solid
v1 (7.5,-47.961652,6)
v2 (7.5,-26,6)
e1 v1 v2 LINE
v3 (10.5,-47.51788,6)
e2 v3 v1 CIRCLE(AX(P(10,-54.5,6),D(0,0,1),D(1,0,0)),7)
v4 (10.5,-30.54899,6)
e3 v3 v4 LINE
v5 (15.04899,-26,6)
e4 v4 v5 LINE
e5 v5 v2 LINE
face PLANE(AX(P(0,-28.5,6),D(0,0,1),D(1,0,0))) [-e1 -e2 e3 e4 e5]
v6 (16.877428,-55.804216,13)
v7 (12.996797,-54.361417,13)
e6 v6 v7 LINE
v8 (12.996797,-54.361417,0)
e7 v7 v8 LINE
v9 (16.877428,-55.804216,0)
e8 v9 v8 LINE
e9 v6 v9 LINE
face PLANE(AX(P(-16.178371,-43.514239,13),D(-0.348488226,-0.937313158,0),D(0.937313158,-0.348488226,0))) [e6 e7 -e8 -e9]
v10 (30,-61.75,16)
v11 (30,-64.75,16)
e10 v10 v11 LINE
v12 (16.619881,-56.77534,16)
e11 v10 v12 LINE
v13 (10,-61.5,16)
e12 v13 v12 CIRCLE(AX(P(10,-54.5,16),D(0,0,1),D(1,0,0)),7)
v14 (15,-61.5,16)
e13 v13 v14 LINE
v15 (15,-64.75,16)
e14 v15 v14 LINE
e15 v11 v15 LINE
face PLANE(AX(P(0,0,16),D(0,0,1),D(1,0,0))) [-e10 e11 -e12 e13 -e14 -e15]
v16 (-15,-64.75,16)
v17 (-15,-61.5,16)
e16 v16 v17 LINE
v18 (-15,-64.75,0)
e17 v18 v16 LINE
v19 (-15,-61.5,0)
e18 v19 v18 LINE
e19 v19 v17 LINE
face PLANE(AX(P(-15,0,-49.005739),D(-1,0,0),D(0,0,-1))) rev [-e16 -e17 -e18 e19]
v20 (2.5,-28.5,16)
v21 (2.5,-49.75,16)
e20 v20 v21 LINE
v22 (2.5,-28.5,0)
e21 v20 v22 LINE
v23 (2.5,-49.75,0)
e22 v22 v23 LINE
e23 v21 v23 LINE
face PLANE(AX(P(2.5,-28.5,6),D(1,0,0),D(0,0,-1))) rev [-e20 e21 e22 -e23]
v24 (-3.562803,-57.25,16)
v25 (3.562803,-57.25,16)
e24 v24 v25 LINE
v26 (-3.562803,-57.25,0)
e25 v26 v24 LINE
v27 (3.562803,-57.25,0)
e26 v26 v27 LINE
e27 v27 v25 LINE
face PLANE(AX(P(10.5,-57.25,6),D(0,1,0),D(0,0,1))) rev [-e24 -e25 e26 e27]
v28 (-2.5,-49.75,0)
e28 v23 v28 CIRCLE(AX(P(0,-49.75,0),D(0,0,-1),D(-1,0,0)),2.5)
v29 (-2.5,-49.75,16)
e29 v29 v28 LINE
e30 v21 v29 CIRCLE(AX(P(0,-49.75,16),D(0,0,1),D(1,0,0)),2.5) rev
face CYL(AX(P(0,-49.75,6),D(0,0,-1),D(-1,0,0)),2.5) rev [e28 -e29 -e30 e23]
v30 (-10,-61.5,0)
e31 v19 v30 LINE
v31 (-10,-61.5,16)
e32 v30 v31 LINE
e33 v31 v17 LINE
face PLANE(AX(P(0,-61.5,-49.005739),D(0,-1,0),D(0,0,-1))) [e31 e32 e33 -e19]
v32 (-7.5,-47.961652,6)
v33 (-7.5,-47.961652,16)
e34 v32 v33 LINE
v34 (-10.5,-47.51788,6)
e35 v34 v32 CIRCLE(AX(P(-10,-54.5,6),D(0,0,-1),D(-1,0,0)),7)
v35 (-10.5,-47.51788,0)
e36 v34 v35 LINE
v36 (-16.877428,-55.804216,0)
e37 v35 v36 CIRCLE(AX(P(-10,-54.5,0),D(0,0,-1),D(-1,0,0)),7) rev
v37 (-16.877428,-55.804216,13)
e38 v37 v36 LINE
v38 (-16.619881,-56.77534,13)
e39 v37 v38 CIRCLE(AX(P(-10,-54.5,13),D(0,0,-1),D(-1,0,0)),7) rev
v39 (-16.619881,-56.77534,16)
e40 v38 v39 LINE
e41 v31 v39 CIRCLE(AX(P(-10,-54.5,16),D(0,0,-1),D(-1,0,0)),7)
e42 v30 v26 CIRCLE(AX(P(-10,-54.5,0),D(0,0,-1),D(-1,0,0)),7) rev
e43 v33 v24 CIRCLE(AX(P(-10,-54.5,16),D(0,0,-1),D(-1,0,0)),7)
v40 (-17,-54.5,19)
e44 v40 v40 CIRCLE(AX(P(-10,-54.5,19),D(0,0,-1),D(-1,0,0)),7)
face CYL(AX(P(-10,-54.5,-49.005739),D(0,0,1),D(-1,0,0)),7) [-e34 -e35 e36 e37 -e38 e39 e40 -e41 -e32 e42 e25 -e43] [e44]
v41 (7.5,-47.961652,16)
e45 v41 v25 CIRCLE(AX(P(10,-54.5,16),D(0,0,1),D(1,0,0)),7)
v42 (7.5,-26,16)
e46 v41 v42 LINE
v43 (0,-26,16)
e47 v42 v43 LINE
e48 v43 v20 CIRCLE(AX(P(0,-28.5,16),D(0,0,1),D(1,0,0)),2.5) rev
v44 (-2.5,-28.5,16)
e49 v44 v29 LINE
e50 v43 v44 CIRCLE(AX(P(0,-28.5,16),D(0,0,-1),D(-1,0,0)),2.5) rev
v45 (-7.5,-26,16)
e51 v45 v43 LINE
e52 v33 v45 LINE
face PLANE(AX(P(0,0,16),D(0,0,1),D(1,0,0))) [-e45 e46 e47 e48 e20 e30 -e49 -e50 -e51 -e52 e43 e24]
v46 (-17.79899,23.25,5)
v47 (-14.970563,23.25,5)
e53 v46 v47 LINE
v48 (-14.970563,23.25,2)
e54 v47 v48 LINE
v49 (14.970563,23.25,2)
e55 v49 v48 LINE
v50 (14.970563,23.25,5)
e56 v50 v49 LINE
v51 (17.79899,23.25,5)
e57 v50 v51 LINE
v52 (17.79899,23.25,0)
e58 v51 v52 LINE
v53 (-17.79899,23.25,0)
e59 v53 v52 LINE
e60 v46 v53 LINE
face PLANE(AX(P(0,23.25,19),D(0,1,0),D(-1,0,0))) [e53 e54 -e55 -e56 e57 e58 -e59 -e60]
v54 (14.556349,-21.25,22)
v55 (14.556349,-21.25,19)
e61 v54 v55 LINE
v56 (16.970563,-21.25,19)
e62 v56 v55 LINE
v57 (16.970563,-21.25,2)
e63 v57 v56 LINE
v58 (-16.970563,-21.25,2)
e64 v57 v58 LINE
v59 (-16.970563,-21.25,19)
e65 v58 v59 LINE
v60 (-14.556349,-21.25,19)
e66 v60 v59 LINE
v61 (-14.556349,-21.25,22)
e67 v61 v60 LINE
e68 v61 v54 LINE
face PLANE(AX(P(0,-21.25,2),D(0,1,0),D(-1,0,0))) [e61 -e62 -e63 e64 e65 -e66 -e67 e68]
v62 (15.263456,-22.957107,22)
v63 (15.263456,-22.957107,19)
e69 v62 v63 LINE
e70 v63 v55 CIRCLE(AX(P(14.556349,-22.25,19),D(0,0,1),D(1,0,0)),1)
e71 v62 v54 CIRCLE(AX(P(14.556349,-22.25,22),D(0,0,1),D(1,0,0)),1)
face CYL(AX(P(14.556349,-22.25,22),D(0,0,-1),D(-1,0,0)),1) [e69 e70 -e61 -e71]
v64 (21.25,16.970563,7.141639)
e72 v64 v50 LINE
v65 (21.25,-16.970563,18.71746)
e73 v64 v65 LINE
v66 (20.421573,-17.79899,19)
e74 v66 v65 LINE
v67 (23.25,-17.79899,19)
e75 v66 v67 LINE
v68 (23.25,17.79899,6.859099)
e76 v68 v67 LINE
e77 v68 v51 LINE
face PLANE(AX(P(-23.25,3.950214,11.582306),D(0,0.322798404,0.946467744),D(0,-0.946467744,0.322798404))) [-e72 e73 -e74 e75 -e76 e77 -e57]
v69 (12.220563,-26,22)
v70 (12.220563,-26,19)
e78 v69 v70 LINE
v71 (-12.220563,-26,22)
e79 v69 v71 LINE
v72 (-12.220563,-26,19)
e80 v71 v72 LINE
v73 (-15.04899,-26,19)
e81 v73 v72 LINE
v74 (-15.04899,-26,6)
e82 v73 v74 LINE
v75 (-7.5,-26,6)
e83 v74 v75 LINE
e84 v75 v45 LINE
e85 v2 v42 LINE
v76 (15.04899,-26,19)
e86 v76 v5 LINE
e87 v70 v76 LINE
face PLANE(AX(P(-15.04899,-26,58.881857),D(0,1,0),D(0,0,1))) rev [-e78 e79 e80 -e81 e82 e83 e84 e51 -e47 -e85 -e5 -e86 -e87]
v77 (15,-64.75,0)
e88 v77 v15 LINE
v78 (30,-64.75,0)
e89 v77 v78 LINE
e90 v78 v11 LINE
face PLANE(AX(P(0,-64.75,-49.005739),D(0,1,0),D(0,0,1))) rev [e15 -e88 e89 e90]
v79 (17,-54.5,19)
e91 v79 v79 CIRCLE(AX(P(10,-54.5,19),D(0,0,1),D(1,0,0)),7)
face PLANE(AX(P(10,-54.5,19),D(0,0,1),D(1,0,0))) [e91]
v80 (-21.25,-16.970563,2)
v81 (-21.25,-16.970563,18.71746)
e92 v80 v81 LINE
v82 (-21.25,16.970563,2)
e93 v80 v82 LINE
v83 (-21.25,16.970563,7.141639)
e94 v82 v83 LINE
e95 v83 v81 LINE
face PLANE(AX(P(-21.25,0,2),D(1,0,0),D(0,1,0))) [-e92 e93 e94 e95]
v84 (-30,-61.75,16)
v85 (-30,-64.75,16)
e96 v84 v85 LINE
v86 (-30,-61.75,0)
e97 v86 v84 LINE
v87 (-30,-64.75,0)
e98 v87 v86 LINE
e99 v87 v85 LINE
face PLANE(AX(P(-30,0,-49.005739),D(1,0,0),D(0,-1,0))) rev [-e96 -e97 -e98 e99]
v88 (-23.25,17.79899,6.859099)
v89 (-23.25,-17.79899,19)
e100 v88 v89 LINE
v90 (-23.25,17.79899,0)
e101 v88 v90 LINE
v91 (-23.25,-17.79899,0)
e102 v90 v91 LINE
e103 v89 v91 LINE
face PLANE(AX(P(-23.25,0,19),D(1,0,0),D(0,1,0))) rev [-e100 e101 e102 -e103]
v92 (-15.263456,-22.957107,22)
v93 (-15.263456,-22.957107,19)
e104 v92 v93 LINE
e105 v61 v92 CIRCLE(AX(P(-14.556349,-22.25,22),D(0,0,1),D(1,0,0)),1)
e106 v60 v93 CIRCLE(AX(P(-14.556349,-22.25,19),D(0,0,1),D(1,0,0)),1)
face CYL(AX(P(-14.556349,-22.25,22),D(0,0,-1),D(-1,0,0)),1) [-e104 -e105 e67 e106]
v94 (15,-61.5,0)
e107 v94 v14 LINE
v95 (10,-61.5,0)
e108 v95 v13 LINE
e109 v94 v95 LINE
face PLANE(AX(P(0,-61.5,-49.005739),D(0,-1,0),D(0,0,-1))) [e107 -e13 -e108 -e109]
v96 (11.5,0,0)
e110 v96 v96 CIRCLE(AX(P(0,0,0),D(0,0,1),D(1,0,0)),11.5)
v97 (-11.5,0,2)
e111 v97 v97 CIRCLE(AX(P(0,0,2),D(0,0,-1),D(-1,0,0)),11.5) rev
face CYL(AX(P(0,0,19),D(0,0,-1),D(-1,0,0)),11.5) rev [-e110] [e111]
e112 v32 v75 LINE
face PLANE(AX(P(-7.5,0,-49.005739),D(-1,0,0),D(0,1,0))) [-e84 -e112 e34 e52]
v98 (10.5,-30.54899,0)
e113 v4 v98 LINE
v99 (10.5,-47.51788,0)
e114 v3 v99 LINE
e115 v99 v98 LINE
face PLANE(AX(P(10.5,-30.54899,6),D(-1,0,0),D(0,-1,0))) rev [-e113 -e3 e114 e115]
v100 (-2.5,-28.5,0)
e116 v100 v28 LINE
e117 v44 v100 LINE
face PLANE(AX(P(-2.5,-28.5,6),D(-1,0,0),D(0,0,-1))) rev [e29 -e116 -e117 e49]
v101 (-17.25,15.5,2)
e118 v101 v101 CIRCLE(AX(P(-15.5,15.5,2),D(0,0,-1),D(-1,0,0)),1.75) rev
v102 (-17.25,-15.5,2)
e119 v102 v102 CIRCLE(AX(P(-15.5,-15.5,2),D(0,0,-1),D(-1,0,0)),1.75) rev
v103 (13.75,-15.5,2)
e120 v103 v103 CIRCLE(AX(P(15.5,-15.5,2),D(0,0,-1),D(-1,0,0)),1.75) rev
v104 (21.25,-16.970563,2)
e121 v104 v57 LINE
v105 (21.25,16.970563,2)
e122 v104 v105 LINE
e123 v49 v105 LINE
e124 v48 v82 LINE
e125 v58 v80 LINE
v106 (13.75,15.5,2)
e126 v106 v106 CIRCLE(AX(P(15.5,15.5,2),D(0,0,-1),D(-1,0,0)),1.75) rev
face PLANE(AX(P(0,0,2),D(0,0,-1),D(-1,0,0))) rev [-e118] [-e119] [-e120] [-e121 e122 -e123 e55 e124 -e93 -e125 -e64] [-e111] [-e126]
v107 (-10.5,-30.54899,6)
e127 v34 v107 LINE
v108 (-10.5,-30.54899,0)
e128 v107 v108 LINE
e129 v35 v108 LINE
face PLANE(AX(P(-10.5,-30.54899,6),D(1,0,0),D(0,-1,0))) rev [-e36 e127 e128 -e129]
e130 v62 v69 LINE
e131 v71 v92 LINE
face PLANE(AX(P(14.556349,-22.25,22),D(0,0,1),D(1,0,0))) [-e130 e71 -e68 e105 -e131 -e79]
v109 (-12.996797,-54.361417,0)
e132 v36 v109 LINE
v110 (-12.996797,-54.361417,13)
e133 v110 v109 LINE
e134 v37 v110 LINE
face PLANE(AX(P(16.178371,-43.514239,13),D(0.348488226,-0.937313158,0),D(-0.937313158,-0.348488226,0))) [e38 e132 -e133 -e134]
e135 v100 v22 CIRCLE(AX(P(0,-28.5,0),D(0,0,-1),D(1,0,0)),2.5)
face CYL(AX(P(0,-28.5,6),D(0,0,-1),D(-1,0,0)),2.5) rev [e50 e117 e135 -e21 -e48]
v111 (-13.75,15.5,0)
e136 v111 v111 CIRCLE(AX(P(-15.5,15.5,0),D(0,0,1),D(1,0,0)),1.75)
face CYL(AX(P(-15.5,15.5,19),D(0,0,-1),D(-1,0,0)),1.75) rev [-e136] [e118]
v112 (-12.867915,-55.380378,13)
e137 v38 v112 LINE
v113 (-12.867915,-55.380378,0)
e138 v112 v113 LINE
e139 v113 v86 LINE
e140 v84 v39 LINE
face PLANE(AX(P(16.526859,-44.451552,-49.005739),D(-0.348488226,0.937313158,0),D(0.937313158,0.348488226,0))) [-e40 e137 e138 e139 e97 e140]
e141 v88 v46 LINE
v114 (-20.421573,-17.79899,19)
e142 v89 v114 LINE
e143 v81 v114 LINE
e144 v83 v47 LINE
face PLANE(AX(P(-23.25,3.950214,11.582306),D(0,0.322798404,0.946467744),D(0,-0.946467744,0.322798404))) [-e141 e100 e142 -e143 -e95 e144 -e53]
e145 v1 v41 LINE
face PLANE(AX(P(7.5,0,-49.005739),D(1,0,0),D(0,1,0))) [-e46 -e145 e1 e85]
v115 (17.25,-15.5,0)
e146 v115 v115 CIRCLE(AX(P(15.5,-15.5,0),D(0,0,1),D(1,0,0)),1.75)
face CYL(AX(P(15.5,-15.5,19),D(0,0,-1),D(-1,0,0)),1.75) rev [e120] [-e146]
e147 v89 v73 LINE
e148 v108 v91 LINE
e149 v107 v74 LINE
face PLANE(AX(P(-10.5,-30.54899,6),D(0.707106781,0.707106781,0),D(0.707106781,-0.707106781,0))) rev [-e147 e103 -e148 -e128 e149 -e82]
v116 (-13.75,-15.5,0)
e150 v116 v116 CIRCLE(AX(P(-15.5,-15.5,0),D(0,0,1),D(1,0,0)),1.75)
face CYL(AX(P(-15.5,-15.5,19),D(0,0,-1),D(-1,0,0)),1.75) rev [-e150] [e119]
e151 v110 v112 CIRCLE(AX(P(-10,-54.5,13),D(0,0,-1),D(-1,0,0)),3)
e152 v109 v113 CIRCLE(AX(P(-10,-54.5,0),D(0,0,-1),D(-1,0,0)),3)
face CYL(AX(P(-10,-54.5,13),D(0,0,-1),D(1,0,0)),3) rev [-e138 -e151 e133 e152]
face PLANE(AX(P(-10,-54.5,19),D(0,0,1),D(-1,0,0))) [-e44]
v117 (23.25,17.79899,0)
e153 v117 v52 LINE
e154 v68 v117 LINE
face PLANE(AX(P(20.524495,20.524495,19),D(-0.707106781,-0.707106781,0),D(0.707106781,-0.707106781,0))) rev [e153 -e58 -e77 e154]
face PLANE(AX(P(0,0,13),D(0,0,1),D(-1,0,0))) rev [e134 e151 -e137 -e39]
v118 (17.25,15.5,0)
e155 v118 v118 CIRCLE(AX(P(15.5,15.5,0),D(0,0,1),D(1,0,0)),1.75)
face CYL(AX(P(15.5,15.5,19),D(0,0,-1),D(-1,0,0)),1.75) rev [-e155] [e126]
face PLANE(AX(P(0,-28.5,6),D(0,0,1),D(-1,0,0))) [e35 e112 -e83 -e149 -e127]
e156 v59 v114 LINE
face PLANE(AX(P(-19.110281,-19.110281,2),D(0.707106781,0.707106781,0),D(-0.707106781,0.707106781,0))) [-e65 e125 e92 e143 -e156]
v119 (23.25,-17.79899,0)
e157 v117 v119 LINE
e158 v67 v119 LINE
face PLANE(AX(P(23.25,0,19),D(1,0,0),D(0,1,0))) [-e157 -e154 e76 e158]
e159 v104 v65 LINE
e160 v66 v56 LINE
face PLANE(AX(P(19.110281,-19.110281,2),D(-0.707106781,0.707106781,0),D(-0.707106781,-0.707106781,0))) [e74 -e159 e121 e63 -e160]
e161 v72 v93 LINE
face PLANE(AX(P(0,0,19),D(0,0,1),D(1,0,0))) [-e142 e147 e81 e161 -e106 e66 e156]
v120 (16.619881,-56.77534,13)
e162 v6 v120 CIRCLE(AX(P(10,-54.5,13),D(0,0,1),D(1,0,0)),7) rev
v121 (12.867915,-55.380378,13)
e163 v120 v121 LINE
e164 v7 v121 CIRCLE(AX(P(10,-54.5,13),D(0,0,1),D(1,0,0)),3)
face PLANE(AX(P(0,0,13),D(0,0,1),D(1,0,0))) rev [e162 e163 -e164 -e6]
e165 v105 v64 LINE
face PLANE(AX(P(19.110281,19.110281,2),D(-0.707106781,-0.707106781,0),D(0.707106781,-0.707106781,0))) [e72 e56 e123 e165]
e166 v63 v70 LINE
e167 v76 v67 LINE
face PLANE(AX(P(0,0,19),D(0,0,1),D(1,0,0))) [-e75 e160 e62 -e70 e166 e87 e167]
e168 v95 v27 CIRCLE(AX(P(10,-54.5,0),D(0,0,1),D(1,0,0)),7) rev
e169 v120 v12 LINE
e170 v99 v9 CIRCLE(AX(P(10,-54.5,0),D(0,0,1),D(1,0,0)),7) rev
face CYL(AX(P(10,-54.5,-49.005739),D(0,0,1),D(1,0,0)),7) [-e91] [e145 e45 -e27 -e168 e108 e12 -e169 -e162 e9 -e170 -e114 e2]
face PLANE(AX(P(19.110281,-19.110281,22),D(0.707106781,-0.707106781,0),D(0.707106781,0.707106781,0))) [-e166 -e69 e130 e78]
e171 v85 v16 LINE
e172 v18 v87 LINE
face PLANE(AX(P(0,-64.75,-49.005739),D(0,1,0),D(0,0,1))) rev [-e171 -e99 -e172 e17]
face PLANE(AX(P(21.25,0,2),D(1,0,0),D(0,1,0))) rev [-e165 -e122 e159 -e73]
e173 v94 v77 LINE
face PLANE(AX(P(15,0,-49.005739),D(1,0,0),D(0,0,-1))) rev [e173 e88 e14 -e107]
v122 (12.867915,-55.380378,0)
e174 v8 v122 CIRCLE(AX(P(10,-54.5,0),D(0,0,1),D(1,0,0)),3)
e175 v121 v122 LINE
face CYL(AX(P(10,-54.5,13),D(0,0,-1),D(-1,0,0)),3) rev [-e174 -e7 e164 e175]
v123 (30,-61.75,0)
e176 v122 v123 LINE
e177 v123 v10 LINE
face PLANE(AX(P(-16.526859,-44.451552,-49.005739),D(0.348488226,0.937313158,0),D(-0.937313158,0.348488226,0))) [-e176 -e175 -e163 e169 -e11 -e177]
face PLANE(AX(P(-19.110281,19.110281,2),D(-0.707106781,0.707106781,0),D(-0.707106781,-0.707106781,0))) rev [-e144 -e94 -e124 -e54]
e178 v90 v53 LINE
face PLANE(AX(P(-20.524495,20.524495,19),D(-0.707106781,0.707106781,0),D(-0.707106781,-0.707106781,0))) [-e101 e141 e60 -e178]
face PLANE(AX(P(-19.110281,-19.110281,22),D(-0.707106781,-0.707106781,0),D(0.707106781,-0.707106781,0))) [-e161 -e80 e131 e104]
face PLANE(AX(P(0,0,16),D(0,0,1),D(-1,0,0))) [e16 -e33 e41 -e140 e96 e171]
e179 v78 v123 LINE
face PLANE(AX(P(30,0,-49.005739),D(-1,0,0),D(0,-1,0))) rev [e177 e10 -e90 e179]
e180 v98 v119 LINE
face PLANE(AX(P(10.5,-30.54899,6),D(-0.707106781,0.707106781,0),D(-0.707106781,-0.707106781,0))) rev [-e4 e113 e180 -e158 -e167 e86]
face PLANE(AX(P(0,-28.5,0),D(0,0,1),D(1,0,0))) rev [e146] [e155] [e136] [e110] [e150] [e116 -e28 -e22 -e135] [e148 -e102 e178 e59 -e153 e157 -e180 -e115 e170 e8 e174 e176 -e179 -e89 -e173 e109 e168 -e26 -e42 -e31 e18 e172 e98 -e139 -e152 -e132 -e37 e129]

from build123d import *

# Parameters (mm, degrees)
SKETCH3_R               = 11.5
SKETCH3_R_2             = 1.75
BOSS_EXTRUDE1_DEPTH     = 19
CUT_EXTRUDE1_START      = 19
SKETCH3_3_R             = 11.5
SKETCH3_3_R_2           = 1.75
CUT_EXTRUDE1_DEPTH      = 17
SKETCH3_4_R             = 1.75
SKETCH3_4_R_2           = 11.5
CUT_EXTRUDE3_DEPTH      = 38.975320933
CUT_EXTRUDE7_DEPTH      = 38.975320933
CUT_EXTRUDE7_DEPTH_BACK = 38.975320933
CUT_EXTRUDE8_DEPTH      = 38.015199581
BOSS_EXTRUDE4_DEPTH     = 19
BOSS_EXTRUDE5_START     = 19
BOSS_EXTRUDE5_DEPTH     = 3
BOSS_EXTRUDE6_DEPTH     = 6
BOSS_EXTRUDE7_START     = -6
BOSS_EXTRUDE7_DEPTH     = 16
SKETCH14_R              = 7
BOSS_EXTRUDE8_DEPTH     = 3
SKETCH15_R              = 3
CUT_EXTRUDE10_DEPTH     = 13


# Read off the part's stored shape, not the designer's step: Boss-Extrude7
with BuildPart() as part:
    # Sketch3 → Boss-Extrude1 (new body)
    # profile 1 of 7: a face of its own
    with BuildSketch(Plane.XY):
        Polygon((-23.25, 17.798989873), (-17.798989873, 23.25), (17.798989873, 23.25), (23.25, 17.798989873), (23.25, -17.798989873), (17.798989873, -23.25), (-17.798989873, -23.25), (-23.25, -17.798989873), align=None)
        Polygon((21.25, 16.970562748), (16.970562748, 21.25), (-16.970562748, 21.25), (-21.25, 16.970562748), (-21.25, -16.970562748), (-16.970562748, -21.25), (16.970562748, -21.25), (21.25, -16.970562748), align=None, mode=Mode.SUBTRACT)
    # profile 2 of 7: a face of its own
    with BuildSketch(Plane.XY):
        Polygon((21.25, 16.970562748), (21.25, -16.970562748), (16.970562748, -21.25), (-16.970562748, -21.25), (-21.25, -16.970562748), (-21.25, 16.970562748), (-16.970562748, 21.25), (16.970562748, 21.25), align=None)
        Circle(SKETCH3_R, mode=Mode.SUBTRACT)
        with Locations((-15.5, -15.5)):
            Circle(SKETCH3_R_2, mode=Mode.SUBTRACT)
        with Locations((15.5, -15.5)):
            Circle(SKETCH3_R_2, mode=Mode.SUBTRACT)
        with Locations((15.5, 15.5)):
            Circle(SKETCH3_R_2, mode=Mode.SUBTRACT)
        with Locations((-15.5, 15.5)):
            Circle(SKETCH3_R_2, mode=Mode.SUBTRACT)
    # profile 3 of 7: a face of its own
    with BuildSketch(Plane.XY):
        with Locations((-15.5, 15.5)):
            Circle(SKETCH3_R_2)
    # profile 4 of 7: a face of its own
    with BuildSketch(Plane.XY):
        with Locations((15.5, 15.5)):
            Circle(SKETCH3_R_2)
    # profile 5 of 7: a face of its own
    with BuildSketch(Plane.XY):
        with Locations((15.5, -15.5)):
            Circle(SKETCH3_R_2)
    # profile 6 of 7: a face of its own
    with BuildSketch(Plane.XY):
        with Locations((-15.5, -15.5)):
            Circle(SKETCH3_R_2)
    # profile 7 of 7: a face of its own
    with BuildSketch(Plane.XY):
        Circle(SKETCH3_R)
    extrude(amount=BOSS_EXTRUDE1_DEPTH)

    # Sketch3<3> → Cut-Extrude1 (cut)
    with BuildSketch(Plane.XY.offset(CUT_EXTRUDE1_START)):
        Polygon((21.25, 16.970562748), (21.25, -16.970562748), (16.970562748, -21.25), (-16.970562748, -21.25), (-21.25, -16.970562748), (-21.25, 16.970562748), (-16.970562748, 21.25), (16.970562748, 21.25), align=None)
        Circle(SKETCH3_3_R, mode=Mode.SUBTRACT)
        with Locations((-15.5, -15.5)):
            Circle(SKETCH3_3_R_2, mode=Mode.SUBTRACT)
        with Locations((15.5, -15.5)):
            Circle(SKETCH3_3_R_2, mode=Mode.SUBTRACT)
        with Locations((15.5, 15.5)):
            Circle(SKETCH3_3_R_2, mode=Mode.SUBTRACT)
        with Locations((-15.5, 15.5)):
            Circle(SKETCH3_3_R_2, mode=Mode.SUBTRACT)
    extrude(amount=-CUT_EXTRUDE1_DEPTH, mode=Mode.SUBTRACT)

    # Sketch3<4> → Cut-Extrude3 (cut, through all)
    with BuildSketch(Plane.XY):
        with Locations(Location((-15.5, 15.5, 0), (0, 0, 180))):
            Circle(SKETCH3_4_R)
        with Locations(Location((15.5, 15.5, 0), (0, 0, 180))):
            Circle(SKETCH3_4_R)
        with Locations(Location((-15.5, -15.5, 0), (0, 0, 180))):
            Circle(SKETCH3_4_R)
        with Locations(Location((0, 0, 0), (0, 0, 180))):
            Circle(SKETCH3_4_R_2)
        with Locations(Location((15.5, -15.5, 0), (0, 0, 180))):
            Circle(SKETCH3_4_R)
    extrude(amount=CUT_EXTRUDE3_DEPTH, mode=Mode.SUBTRACT)

    # Sketch6 → Cut-Extrude7 (cut, two sides: drawn at the far end of the back side and taken through both)
    with BuildSketch(Plane(origin=(0, 0, 0), x_dir=(0, 0, -1), z_dir=(1, 0, 0)).offset(-CUT_EXTRUDE7_DEPTH_BACK)):
        Polygon((-19, 23.25), (-5, 23.25), (-19, -17.798989873), align=None)
    extrude(amount=CUT_EXTRUDE7_DEPTH + CUT_EXTRUDE7_DEPTH_BACK, mode=Mode.SUBTRACT)

    # Sketch8 → Cut-Extrude8 (cut, through all)
    with BuildSketch(Plane.XY.offset(2)):
        Polygon((-16.970562748, 21.25), (-14.970562748, 23.25), (14.970562748, 23.25), (16.970562748, 21.25), align=None)
    extrude(amount=CUT_EXTRUDE8_DEPTH, mode=Mode.SUBTRACT)

    # Sketch10 → Boss-Extrude4 (add)
    with BuildSketch(Plane.XY):
        Polygon((19.798989873, -21.25), (-19.798989873, -21.25), (-15.048989873, -26), (15.048989873, -26), align=None)
    extrude(amount=BOSS_EXTRUDE4_DEPTH)

    # Sketch11 → Boss-Extrude5 (add)
    with BuildSketch(Plane.XY.offset(BOSS_EXTRUDE5_START)):
        with BuildLine():
            Line((-14.556349186, -21.25), (14.556349186, -21.25))
            ThreePointArc((14.556349186, -21.25), (15.480228719, -21.867316568), (15.263455967, -22.957106781))
            Line((15.263455967, -22.957106781), (12.220562748, -26))
            Line((12.220562748, -26), (-12.220562748, -26))
            Line((-12.220562748, -26), (-15.263455967, -22.957106781))
            ThreePointArc((-15.263455967, -22.957106781), (-15.480228719, -21.867316568), (-14.556349186, -21.25))
        make_face()
    extrude(amount=BOSS_EXTRUDE5_DEPTH)


with BuildPart() as body_2:
    # Sketch12 → Boss-Extrude6 (new body)
    with BuildSketch(Plane.XY):
        with BuildLine():
            Line((2.5, -28.5), (2.5, -49.75))
            ThreePointArc((2.5, -49.75), (1.767766953, -51.517766953), (0, -52.25))
            Line((0, -52.25), (0, -57.25))
            Line((0, -57.25), (10.5, -57.25))
            Line((10.5, -57.25), (10.5, -30.548989873))
            Line((10.5, -30.548989873), (15.048989873, -26))
            Line((15.048989873, -26), (0, -26))
            ThreePointArc((0, -26), (1.767766953, -26.732233047), (2.5, -28.5))
        make_face()
    extrude(amount=BOSS_EXTRUDE6_DEPTH)

    # Boss-Extrude7 outline → Boss-Extrude7 (add)
    with BuildSketch(Plane.XY.offset(6).offset(BOSS_EXTRUDE7_START)):
        with BuildLine():
            Line((7.5, -26), (0, -26))
            ThreePointArc((0, -26), (1.767766953, -26.732233047), (2.5, -28.5))
            Line((2.5, -28.5), (2.5, -49.75))
            ThreePointArc((2.5, -49.75), (1.767766953, -51.517766953), (0, -52.25))
            Line((0, -52.25), (0, -57.25))
            Line((0, -57.25), (3.562803405, -57.25))
            ThreePointArc((3.562803405, -57.25), (6.143187845, -60.341660723), (10, -61.5))
            Line((10, -61.5), (15, -61.5))
            Line((15, -61.5), (15, -64.75))
            Line((15, -64.75), (30, -64.75))
            Line((30, -64.75), (30, -61.75))
            Line((30, -61.75), (16.619881116, -56.775340415))
            ThreePointArc((16.619881116, -56.775340415), (14.864528014, -49.466475668), (7.5, -47.961651585))
            Line((7.5, -47.961651585), (7.5, -26))
        make_face()
    extrude(amount=BOSS_EXTRUDE7_DEPTH)

    # Sketch14 → Boss-Extrude8 (add)
    with BuildSketch(Plane.XY.offset(16)):
        with Locations((10, -54.5)):
            Circle(SKETCH14_R)
    extrude(amount=BOSS_EXTRUDE8_DEPTH)

    # Sketch15 → Cut-Extrude10 (cut)
    with BuildSketch(Plane.XY):
        with Locations((10, -54.5)):
            Circle(SKETCH15_R)
        with BuildLine():
            Line((16.866218411, -56.866927358), (17.214706637, -55.9296142))
            Line((17.214706637, -55.9296142), (12.996797424, -54.361417185))
            ThreePointArc((12.996797424, -54.361417185), (12.999199249, -54.430690092), (13, -54.5))
            ThreePointArc((13, -54.5), (12.966794868, -54.94511595), (12.867914527, -55.380378478))
            Line((12.867914527, -55.380378478), (16.866218411, -56.866927358))
        make_face()
    extrude(amount=CUT_EXTRUDE10_DEPTH, mode=Mode.SUBTRACT)


with BuildPart() as body_3:
    # Mirror1: mirrored copy
    add(body_2.part.mirror(Plane(origin=(0, 0, 0), x_dir=(0, 0, 1), z_dir=(1, 0, 0))))


with BuildPart() as body_2_1:
    add(body_2.part)

    # Combine1: union body 3, part
    add(body_3.part)
    add(part.part)


solid = body_2_1.part
